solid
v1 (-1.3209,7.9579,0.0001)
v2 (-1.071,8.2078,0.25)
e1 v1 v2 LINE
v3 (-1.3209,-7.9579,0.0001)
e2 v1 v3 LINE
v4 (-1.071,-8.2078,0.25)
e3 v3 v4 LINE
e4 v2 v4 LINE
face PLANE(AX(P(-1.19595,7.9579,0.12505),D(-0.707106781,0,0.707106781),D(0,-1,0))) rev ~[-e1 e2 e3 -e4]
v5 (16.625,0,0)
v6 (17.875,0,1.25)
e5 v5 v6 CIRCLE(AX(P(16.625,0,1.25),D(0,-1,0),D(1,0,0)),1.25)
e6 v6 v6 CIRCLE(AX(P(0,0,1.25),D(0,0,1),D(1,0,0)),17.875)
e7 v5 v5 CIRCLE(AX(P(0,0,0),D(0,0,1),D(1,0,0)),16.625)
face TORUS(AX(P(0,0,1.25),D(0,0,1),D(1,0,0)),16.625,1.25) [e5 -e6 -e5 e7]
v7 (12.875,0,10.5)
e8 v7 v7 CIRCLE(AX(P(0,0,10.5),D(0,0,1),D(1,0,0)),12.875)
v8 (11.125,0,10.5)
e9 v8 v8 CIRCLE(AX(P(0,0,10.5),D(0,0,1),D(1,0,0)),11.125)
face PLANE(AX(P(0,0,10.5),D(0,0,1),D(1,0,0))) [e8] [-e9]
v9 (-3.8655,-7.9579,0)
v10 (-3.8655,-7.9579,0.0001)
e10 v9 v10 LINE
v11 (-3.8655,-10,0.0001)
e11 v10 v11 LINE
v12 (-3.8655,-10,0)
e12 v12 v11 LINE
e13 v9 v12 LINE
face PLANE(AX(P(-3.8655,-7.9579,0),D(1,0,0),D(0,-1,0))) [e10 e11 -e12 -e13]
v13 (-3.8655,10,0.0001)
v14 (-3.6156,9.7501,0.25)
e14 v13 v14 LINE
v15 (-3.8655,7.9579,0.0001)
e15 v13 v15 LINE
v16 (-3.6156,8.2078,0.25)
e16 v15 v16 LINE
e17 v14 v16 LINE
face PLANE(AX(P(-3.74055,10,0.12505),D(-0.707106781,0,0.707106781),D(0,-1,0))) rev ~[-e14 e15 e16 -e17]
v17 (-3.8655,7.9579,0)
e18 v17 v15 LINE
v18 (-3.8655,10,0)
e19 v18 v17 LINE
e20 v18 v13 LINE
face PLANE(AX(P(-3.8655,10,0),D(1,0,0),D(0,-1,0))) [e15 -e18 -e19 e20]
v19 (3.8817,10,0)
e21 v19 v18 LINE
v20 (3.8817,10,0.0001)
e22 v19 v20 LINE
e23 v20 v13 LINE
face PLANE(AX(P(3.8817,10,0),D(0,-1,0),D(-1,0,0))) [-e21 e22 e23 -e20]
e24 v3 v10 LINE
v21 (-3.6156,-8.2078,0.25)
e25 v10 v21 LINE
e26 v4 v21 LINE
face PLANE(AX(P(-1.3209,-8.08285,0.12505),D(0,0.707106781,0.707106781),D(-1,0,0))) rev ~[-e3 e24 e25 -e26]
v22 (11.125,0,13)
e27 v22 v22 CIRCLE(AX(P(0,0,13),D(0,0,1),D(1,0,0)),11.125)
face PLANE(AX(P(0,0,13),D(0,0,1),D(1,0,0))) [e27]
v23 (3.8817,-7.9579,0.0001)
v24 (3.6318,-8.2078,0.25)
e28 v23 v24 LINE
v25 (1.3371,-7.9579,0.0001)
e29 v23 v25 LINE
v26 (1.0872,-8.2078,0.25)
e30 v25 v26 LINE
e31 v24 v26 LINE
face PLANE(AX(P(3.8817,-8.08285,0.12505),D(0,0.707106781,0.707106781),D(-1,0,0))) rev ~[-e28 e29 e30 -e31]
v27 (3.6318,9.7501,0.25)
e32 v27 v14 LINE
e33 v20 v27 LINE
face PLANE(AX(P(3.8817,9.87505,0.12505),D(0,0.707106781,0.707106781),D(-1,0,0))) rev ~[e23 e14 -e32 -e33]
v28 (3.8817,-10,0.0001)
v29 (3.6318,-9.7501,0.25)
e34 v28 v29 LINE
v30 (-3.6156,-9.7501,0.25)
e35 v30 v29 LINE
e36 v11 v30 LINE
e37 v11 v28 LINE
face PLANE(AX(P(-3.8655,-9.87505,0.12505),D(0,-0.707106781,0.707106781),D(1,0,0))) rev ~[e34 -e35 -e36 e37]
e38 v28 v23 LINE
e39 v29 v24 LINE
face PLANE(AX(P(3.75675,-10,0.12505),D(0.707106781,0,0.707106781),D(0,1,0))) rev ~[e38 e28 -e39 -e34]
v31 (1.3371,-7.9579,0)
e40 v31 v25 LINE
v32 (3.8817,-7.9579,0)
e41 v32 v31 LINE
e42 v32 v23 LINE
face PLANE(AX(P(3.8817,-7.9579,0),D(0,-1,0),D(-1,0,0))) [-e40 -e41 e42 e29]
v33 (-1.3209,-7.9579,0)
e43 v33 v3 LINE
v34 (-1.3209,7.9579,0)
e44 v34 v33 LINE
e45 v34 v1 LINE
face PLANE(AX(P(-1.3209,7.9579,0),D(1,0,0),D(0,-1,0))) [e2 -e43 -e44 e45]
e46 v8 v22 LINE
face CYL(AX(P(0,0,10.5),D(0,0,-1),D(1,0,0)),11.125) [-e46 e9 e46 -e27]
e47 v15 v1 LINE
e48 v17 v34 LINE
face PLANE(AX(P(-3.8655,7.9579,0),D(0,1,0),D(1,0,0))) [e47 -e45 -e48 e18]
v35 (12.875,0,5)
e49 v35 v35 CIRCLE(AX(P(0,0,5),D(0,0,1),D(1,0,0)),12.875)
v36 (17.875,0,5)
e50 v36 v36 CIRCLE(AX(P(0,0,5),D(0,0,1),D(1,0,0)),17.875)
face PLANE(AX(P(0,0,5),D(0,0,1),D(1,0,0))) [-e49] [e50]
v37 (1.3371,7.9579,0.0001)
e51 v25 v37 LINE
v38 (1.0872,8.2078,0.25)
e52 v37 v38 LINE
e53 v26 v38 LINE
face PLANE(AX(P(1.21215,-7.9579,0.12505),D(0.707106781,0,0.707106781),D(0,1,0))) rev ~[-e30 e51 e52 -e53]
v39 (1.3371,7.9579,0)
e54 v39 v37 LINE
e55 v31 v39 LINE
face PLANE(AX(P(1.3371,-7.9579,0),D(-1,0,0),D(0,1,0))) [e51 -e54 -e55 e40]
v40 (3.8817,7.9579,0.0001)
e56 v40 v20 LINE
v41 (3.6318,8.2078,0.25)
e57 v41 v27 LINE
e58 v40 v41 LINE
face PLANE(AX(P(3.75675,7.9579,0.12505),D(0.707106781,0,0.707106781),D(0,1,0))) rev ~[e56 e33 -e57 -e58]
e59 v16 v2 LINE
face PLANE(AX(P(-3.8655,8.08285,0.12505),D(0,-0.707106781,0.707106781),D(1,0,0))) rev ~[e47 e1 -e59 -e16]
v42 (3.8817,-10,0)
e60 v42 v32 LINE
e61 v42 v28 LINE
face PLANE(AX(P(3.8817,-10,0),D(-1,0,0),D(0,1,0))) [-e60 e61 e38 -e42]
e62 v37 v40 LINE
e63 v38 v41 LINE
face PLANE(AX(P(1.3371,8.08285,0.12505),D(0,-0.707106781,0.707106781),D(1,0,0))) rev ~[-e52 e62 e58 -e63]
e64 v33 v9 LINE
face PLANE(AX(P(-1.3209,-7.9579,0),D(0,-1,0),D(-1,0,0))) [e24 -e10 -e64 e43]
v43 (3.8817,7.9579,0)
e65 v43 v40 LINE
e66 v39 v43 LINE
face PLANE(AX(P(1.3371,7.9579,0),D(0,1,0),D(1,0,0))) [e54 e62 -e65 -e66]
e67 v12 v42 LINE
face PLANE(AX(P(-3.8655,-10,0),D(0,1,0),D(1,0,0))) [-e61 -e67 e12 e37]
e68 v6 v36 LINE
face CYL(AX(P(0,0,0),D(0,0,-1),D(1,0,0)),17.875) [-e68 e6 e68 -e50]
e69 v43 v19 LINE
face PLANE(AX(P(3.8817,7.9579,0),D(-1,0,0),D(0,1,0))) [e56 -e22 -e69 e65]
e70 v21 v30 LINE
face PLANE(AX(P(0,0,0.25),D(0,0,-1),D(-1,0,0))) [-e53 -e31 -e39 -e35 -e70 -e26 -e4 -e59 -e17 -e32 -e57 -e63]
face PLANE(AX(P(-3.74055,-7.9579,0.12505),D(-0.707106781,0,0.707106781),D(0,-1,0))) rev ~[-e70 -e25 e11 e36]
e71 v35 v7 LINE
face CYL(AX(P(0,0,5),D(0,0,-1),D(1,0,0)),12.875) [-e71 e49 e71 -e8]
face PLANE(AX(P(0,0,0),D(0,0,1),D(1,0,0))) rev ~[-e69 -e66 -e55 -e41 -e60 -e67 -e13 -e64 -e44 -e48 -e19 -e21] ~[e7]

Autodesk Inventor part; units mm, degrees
ref_plane "YZ Plane" through (0, 0, 0) normal (1, 0, 0) x (0, 1, 0)
ref_plane "XZ Plane" through (0, 0, 0) normal (0, 1, 0) x (-1, 0, 0)
ref_plane "XY Plane" through (0, 0, 0) normal (0, 0, 1) x (1, 0, 0)
sketch "Sketch1" plane through (0, 0, 0) normal (0, 0, 1) x (1, 0, 0)
  circle A0 centre (0, 0) radius 11.125
  circle A1 centre (0, 0) radius 12.875
  circle A2 centre (0, 0) radius 17.875
  dimension "d0" = 22.25
  dimension "d1" = 25.75
  dimension "d2" = 5
extrude "Extrusion1" add sketch "Sketch1" along normal blind 5 contours A0 | A1 | A2
extrude "Extrusion2" add sketch "Sketch1" along normal blind 5.5 from surface at 5 contours A0 | A1
extrude "Extrusion3" add sketch "Sketch1" along normal blind 2.5 from surface at 10.5 contours A0
fillet "Fillet1" radius 1.25 1 edges at (-17.875, 0, 0)
sketch "Sketch2" plane through (0, 0, 0) normal (0, 0, -1) x (-1, 0, 0)
  line L0 (-12.5, -12.5) -> (12.5, -12.5)
  line L1 (12.5, -12.5) -> (12.5, 12.5)
  line L2 (12.5, 12.5) -> (-12.5, 12.5)
  line L3 (-12.5, 12.5) -> (-12.5, -12.5)
  line L4 (-12.5, -12.5) -> (12.5, 12.5) construction
  line L5 (12.5, -12.5) -> (-12.5, 12.5) construction
  line L6 (-12.5, 12.5) -> (12.5, 12.5) construction
  line L7 (12.5, 12.5) -> (12.5, -12.5) construction
  line L8 (12.5, -12.5) -> (-12.5, -12.5) construction
  line L9 (-12.5, -12.5) -> (-12.5, 12.5) construction
  line L10 (3.8655, -10) -> (-3.8817, -10)
  line L11 (-3.8817, -10) -> (-3.8817, -7.9579)
  line L12 (-3.8817, -7.9579) -> (-1.3371, -7.9579)
  line L13 (-1.3371, -7.9579) -> (-1.3371, 7.9579)
  line L14 (-1.3371, 7.9579) -> (-3.8817, 7.9579)
  line L15 (-3.8817, 7.9579) -> (-3.8817, 10)
  line L16 (-3.8817, 10) -> (3.8655, 10)
  line L17 (3.8655, 10) -> (3.8655, 7.9579)
  line L18 (3.8655, 7.9579) -> (1.3209, 7.9579)
  line L19 (1.3209, 7.9579) -> (1.3209, -7.9579)
  line L20 (1.3209, -7.9579) -> (3.8655, -7.9579)
  line L21 (3.8655, -7.9579) -> (3.8655, -10)
  point P0 (0, 0)
  dimension "d10" = 25
  dimension "d11" = 25
extrude "Extrusion4" cut sketch "Sketch2" against normal blind 0.25 contours L10 L11 L12 L13 L14 L15 L16 L17 L18 L19 L20 L21
chamfer "Chamfer1" distance 0.25 angle 45 12 edges at (0.0081, -10, 0.25) (3.8817, -8.9789, 0.25) (2.6094, -7.9579, 0.25) (1.3371, 0, 0.25) (2.6094, 7.9579, 0.25) (3.8817, 8.9789, 0.25) (0.0081, 10, 0.25) (-3.8655, 8.9789, 0.25) (-2.5932, 7.9579, 0.25) (-1.3209, 0, 0.25) (-2.5932, -7.9579, 0.25) (-3.8655, -8.9789, 0.25)
properties part number "Inner Ring Press"
